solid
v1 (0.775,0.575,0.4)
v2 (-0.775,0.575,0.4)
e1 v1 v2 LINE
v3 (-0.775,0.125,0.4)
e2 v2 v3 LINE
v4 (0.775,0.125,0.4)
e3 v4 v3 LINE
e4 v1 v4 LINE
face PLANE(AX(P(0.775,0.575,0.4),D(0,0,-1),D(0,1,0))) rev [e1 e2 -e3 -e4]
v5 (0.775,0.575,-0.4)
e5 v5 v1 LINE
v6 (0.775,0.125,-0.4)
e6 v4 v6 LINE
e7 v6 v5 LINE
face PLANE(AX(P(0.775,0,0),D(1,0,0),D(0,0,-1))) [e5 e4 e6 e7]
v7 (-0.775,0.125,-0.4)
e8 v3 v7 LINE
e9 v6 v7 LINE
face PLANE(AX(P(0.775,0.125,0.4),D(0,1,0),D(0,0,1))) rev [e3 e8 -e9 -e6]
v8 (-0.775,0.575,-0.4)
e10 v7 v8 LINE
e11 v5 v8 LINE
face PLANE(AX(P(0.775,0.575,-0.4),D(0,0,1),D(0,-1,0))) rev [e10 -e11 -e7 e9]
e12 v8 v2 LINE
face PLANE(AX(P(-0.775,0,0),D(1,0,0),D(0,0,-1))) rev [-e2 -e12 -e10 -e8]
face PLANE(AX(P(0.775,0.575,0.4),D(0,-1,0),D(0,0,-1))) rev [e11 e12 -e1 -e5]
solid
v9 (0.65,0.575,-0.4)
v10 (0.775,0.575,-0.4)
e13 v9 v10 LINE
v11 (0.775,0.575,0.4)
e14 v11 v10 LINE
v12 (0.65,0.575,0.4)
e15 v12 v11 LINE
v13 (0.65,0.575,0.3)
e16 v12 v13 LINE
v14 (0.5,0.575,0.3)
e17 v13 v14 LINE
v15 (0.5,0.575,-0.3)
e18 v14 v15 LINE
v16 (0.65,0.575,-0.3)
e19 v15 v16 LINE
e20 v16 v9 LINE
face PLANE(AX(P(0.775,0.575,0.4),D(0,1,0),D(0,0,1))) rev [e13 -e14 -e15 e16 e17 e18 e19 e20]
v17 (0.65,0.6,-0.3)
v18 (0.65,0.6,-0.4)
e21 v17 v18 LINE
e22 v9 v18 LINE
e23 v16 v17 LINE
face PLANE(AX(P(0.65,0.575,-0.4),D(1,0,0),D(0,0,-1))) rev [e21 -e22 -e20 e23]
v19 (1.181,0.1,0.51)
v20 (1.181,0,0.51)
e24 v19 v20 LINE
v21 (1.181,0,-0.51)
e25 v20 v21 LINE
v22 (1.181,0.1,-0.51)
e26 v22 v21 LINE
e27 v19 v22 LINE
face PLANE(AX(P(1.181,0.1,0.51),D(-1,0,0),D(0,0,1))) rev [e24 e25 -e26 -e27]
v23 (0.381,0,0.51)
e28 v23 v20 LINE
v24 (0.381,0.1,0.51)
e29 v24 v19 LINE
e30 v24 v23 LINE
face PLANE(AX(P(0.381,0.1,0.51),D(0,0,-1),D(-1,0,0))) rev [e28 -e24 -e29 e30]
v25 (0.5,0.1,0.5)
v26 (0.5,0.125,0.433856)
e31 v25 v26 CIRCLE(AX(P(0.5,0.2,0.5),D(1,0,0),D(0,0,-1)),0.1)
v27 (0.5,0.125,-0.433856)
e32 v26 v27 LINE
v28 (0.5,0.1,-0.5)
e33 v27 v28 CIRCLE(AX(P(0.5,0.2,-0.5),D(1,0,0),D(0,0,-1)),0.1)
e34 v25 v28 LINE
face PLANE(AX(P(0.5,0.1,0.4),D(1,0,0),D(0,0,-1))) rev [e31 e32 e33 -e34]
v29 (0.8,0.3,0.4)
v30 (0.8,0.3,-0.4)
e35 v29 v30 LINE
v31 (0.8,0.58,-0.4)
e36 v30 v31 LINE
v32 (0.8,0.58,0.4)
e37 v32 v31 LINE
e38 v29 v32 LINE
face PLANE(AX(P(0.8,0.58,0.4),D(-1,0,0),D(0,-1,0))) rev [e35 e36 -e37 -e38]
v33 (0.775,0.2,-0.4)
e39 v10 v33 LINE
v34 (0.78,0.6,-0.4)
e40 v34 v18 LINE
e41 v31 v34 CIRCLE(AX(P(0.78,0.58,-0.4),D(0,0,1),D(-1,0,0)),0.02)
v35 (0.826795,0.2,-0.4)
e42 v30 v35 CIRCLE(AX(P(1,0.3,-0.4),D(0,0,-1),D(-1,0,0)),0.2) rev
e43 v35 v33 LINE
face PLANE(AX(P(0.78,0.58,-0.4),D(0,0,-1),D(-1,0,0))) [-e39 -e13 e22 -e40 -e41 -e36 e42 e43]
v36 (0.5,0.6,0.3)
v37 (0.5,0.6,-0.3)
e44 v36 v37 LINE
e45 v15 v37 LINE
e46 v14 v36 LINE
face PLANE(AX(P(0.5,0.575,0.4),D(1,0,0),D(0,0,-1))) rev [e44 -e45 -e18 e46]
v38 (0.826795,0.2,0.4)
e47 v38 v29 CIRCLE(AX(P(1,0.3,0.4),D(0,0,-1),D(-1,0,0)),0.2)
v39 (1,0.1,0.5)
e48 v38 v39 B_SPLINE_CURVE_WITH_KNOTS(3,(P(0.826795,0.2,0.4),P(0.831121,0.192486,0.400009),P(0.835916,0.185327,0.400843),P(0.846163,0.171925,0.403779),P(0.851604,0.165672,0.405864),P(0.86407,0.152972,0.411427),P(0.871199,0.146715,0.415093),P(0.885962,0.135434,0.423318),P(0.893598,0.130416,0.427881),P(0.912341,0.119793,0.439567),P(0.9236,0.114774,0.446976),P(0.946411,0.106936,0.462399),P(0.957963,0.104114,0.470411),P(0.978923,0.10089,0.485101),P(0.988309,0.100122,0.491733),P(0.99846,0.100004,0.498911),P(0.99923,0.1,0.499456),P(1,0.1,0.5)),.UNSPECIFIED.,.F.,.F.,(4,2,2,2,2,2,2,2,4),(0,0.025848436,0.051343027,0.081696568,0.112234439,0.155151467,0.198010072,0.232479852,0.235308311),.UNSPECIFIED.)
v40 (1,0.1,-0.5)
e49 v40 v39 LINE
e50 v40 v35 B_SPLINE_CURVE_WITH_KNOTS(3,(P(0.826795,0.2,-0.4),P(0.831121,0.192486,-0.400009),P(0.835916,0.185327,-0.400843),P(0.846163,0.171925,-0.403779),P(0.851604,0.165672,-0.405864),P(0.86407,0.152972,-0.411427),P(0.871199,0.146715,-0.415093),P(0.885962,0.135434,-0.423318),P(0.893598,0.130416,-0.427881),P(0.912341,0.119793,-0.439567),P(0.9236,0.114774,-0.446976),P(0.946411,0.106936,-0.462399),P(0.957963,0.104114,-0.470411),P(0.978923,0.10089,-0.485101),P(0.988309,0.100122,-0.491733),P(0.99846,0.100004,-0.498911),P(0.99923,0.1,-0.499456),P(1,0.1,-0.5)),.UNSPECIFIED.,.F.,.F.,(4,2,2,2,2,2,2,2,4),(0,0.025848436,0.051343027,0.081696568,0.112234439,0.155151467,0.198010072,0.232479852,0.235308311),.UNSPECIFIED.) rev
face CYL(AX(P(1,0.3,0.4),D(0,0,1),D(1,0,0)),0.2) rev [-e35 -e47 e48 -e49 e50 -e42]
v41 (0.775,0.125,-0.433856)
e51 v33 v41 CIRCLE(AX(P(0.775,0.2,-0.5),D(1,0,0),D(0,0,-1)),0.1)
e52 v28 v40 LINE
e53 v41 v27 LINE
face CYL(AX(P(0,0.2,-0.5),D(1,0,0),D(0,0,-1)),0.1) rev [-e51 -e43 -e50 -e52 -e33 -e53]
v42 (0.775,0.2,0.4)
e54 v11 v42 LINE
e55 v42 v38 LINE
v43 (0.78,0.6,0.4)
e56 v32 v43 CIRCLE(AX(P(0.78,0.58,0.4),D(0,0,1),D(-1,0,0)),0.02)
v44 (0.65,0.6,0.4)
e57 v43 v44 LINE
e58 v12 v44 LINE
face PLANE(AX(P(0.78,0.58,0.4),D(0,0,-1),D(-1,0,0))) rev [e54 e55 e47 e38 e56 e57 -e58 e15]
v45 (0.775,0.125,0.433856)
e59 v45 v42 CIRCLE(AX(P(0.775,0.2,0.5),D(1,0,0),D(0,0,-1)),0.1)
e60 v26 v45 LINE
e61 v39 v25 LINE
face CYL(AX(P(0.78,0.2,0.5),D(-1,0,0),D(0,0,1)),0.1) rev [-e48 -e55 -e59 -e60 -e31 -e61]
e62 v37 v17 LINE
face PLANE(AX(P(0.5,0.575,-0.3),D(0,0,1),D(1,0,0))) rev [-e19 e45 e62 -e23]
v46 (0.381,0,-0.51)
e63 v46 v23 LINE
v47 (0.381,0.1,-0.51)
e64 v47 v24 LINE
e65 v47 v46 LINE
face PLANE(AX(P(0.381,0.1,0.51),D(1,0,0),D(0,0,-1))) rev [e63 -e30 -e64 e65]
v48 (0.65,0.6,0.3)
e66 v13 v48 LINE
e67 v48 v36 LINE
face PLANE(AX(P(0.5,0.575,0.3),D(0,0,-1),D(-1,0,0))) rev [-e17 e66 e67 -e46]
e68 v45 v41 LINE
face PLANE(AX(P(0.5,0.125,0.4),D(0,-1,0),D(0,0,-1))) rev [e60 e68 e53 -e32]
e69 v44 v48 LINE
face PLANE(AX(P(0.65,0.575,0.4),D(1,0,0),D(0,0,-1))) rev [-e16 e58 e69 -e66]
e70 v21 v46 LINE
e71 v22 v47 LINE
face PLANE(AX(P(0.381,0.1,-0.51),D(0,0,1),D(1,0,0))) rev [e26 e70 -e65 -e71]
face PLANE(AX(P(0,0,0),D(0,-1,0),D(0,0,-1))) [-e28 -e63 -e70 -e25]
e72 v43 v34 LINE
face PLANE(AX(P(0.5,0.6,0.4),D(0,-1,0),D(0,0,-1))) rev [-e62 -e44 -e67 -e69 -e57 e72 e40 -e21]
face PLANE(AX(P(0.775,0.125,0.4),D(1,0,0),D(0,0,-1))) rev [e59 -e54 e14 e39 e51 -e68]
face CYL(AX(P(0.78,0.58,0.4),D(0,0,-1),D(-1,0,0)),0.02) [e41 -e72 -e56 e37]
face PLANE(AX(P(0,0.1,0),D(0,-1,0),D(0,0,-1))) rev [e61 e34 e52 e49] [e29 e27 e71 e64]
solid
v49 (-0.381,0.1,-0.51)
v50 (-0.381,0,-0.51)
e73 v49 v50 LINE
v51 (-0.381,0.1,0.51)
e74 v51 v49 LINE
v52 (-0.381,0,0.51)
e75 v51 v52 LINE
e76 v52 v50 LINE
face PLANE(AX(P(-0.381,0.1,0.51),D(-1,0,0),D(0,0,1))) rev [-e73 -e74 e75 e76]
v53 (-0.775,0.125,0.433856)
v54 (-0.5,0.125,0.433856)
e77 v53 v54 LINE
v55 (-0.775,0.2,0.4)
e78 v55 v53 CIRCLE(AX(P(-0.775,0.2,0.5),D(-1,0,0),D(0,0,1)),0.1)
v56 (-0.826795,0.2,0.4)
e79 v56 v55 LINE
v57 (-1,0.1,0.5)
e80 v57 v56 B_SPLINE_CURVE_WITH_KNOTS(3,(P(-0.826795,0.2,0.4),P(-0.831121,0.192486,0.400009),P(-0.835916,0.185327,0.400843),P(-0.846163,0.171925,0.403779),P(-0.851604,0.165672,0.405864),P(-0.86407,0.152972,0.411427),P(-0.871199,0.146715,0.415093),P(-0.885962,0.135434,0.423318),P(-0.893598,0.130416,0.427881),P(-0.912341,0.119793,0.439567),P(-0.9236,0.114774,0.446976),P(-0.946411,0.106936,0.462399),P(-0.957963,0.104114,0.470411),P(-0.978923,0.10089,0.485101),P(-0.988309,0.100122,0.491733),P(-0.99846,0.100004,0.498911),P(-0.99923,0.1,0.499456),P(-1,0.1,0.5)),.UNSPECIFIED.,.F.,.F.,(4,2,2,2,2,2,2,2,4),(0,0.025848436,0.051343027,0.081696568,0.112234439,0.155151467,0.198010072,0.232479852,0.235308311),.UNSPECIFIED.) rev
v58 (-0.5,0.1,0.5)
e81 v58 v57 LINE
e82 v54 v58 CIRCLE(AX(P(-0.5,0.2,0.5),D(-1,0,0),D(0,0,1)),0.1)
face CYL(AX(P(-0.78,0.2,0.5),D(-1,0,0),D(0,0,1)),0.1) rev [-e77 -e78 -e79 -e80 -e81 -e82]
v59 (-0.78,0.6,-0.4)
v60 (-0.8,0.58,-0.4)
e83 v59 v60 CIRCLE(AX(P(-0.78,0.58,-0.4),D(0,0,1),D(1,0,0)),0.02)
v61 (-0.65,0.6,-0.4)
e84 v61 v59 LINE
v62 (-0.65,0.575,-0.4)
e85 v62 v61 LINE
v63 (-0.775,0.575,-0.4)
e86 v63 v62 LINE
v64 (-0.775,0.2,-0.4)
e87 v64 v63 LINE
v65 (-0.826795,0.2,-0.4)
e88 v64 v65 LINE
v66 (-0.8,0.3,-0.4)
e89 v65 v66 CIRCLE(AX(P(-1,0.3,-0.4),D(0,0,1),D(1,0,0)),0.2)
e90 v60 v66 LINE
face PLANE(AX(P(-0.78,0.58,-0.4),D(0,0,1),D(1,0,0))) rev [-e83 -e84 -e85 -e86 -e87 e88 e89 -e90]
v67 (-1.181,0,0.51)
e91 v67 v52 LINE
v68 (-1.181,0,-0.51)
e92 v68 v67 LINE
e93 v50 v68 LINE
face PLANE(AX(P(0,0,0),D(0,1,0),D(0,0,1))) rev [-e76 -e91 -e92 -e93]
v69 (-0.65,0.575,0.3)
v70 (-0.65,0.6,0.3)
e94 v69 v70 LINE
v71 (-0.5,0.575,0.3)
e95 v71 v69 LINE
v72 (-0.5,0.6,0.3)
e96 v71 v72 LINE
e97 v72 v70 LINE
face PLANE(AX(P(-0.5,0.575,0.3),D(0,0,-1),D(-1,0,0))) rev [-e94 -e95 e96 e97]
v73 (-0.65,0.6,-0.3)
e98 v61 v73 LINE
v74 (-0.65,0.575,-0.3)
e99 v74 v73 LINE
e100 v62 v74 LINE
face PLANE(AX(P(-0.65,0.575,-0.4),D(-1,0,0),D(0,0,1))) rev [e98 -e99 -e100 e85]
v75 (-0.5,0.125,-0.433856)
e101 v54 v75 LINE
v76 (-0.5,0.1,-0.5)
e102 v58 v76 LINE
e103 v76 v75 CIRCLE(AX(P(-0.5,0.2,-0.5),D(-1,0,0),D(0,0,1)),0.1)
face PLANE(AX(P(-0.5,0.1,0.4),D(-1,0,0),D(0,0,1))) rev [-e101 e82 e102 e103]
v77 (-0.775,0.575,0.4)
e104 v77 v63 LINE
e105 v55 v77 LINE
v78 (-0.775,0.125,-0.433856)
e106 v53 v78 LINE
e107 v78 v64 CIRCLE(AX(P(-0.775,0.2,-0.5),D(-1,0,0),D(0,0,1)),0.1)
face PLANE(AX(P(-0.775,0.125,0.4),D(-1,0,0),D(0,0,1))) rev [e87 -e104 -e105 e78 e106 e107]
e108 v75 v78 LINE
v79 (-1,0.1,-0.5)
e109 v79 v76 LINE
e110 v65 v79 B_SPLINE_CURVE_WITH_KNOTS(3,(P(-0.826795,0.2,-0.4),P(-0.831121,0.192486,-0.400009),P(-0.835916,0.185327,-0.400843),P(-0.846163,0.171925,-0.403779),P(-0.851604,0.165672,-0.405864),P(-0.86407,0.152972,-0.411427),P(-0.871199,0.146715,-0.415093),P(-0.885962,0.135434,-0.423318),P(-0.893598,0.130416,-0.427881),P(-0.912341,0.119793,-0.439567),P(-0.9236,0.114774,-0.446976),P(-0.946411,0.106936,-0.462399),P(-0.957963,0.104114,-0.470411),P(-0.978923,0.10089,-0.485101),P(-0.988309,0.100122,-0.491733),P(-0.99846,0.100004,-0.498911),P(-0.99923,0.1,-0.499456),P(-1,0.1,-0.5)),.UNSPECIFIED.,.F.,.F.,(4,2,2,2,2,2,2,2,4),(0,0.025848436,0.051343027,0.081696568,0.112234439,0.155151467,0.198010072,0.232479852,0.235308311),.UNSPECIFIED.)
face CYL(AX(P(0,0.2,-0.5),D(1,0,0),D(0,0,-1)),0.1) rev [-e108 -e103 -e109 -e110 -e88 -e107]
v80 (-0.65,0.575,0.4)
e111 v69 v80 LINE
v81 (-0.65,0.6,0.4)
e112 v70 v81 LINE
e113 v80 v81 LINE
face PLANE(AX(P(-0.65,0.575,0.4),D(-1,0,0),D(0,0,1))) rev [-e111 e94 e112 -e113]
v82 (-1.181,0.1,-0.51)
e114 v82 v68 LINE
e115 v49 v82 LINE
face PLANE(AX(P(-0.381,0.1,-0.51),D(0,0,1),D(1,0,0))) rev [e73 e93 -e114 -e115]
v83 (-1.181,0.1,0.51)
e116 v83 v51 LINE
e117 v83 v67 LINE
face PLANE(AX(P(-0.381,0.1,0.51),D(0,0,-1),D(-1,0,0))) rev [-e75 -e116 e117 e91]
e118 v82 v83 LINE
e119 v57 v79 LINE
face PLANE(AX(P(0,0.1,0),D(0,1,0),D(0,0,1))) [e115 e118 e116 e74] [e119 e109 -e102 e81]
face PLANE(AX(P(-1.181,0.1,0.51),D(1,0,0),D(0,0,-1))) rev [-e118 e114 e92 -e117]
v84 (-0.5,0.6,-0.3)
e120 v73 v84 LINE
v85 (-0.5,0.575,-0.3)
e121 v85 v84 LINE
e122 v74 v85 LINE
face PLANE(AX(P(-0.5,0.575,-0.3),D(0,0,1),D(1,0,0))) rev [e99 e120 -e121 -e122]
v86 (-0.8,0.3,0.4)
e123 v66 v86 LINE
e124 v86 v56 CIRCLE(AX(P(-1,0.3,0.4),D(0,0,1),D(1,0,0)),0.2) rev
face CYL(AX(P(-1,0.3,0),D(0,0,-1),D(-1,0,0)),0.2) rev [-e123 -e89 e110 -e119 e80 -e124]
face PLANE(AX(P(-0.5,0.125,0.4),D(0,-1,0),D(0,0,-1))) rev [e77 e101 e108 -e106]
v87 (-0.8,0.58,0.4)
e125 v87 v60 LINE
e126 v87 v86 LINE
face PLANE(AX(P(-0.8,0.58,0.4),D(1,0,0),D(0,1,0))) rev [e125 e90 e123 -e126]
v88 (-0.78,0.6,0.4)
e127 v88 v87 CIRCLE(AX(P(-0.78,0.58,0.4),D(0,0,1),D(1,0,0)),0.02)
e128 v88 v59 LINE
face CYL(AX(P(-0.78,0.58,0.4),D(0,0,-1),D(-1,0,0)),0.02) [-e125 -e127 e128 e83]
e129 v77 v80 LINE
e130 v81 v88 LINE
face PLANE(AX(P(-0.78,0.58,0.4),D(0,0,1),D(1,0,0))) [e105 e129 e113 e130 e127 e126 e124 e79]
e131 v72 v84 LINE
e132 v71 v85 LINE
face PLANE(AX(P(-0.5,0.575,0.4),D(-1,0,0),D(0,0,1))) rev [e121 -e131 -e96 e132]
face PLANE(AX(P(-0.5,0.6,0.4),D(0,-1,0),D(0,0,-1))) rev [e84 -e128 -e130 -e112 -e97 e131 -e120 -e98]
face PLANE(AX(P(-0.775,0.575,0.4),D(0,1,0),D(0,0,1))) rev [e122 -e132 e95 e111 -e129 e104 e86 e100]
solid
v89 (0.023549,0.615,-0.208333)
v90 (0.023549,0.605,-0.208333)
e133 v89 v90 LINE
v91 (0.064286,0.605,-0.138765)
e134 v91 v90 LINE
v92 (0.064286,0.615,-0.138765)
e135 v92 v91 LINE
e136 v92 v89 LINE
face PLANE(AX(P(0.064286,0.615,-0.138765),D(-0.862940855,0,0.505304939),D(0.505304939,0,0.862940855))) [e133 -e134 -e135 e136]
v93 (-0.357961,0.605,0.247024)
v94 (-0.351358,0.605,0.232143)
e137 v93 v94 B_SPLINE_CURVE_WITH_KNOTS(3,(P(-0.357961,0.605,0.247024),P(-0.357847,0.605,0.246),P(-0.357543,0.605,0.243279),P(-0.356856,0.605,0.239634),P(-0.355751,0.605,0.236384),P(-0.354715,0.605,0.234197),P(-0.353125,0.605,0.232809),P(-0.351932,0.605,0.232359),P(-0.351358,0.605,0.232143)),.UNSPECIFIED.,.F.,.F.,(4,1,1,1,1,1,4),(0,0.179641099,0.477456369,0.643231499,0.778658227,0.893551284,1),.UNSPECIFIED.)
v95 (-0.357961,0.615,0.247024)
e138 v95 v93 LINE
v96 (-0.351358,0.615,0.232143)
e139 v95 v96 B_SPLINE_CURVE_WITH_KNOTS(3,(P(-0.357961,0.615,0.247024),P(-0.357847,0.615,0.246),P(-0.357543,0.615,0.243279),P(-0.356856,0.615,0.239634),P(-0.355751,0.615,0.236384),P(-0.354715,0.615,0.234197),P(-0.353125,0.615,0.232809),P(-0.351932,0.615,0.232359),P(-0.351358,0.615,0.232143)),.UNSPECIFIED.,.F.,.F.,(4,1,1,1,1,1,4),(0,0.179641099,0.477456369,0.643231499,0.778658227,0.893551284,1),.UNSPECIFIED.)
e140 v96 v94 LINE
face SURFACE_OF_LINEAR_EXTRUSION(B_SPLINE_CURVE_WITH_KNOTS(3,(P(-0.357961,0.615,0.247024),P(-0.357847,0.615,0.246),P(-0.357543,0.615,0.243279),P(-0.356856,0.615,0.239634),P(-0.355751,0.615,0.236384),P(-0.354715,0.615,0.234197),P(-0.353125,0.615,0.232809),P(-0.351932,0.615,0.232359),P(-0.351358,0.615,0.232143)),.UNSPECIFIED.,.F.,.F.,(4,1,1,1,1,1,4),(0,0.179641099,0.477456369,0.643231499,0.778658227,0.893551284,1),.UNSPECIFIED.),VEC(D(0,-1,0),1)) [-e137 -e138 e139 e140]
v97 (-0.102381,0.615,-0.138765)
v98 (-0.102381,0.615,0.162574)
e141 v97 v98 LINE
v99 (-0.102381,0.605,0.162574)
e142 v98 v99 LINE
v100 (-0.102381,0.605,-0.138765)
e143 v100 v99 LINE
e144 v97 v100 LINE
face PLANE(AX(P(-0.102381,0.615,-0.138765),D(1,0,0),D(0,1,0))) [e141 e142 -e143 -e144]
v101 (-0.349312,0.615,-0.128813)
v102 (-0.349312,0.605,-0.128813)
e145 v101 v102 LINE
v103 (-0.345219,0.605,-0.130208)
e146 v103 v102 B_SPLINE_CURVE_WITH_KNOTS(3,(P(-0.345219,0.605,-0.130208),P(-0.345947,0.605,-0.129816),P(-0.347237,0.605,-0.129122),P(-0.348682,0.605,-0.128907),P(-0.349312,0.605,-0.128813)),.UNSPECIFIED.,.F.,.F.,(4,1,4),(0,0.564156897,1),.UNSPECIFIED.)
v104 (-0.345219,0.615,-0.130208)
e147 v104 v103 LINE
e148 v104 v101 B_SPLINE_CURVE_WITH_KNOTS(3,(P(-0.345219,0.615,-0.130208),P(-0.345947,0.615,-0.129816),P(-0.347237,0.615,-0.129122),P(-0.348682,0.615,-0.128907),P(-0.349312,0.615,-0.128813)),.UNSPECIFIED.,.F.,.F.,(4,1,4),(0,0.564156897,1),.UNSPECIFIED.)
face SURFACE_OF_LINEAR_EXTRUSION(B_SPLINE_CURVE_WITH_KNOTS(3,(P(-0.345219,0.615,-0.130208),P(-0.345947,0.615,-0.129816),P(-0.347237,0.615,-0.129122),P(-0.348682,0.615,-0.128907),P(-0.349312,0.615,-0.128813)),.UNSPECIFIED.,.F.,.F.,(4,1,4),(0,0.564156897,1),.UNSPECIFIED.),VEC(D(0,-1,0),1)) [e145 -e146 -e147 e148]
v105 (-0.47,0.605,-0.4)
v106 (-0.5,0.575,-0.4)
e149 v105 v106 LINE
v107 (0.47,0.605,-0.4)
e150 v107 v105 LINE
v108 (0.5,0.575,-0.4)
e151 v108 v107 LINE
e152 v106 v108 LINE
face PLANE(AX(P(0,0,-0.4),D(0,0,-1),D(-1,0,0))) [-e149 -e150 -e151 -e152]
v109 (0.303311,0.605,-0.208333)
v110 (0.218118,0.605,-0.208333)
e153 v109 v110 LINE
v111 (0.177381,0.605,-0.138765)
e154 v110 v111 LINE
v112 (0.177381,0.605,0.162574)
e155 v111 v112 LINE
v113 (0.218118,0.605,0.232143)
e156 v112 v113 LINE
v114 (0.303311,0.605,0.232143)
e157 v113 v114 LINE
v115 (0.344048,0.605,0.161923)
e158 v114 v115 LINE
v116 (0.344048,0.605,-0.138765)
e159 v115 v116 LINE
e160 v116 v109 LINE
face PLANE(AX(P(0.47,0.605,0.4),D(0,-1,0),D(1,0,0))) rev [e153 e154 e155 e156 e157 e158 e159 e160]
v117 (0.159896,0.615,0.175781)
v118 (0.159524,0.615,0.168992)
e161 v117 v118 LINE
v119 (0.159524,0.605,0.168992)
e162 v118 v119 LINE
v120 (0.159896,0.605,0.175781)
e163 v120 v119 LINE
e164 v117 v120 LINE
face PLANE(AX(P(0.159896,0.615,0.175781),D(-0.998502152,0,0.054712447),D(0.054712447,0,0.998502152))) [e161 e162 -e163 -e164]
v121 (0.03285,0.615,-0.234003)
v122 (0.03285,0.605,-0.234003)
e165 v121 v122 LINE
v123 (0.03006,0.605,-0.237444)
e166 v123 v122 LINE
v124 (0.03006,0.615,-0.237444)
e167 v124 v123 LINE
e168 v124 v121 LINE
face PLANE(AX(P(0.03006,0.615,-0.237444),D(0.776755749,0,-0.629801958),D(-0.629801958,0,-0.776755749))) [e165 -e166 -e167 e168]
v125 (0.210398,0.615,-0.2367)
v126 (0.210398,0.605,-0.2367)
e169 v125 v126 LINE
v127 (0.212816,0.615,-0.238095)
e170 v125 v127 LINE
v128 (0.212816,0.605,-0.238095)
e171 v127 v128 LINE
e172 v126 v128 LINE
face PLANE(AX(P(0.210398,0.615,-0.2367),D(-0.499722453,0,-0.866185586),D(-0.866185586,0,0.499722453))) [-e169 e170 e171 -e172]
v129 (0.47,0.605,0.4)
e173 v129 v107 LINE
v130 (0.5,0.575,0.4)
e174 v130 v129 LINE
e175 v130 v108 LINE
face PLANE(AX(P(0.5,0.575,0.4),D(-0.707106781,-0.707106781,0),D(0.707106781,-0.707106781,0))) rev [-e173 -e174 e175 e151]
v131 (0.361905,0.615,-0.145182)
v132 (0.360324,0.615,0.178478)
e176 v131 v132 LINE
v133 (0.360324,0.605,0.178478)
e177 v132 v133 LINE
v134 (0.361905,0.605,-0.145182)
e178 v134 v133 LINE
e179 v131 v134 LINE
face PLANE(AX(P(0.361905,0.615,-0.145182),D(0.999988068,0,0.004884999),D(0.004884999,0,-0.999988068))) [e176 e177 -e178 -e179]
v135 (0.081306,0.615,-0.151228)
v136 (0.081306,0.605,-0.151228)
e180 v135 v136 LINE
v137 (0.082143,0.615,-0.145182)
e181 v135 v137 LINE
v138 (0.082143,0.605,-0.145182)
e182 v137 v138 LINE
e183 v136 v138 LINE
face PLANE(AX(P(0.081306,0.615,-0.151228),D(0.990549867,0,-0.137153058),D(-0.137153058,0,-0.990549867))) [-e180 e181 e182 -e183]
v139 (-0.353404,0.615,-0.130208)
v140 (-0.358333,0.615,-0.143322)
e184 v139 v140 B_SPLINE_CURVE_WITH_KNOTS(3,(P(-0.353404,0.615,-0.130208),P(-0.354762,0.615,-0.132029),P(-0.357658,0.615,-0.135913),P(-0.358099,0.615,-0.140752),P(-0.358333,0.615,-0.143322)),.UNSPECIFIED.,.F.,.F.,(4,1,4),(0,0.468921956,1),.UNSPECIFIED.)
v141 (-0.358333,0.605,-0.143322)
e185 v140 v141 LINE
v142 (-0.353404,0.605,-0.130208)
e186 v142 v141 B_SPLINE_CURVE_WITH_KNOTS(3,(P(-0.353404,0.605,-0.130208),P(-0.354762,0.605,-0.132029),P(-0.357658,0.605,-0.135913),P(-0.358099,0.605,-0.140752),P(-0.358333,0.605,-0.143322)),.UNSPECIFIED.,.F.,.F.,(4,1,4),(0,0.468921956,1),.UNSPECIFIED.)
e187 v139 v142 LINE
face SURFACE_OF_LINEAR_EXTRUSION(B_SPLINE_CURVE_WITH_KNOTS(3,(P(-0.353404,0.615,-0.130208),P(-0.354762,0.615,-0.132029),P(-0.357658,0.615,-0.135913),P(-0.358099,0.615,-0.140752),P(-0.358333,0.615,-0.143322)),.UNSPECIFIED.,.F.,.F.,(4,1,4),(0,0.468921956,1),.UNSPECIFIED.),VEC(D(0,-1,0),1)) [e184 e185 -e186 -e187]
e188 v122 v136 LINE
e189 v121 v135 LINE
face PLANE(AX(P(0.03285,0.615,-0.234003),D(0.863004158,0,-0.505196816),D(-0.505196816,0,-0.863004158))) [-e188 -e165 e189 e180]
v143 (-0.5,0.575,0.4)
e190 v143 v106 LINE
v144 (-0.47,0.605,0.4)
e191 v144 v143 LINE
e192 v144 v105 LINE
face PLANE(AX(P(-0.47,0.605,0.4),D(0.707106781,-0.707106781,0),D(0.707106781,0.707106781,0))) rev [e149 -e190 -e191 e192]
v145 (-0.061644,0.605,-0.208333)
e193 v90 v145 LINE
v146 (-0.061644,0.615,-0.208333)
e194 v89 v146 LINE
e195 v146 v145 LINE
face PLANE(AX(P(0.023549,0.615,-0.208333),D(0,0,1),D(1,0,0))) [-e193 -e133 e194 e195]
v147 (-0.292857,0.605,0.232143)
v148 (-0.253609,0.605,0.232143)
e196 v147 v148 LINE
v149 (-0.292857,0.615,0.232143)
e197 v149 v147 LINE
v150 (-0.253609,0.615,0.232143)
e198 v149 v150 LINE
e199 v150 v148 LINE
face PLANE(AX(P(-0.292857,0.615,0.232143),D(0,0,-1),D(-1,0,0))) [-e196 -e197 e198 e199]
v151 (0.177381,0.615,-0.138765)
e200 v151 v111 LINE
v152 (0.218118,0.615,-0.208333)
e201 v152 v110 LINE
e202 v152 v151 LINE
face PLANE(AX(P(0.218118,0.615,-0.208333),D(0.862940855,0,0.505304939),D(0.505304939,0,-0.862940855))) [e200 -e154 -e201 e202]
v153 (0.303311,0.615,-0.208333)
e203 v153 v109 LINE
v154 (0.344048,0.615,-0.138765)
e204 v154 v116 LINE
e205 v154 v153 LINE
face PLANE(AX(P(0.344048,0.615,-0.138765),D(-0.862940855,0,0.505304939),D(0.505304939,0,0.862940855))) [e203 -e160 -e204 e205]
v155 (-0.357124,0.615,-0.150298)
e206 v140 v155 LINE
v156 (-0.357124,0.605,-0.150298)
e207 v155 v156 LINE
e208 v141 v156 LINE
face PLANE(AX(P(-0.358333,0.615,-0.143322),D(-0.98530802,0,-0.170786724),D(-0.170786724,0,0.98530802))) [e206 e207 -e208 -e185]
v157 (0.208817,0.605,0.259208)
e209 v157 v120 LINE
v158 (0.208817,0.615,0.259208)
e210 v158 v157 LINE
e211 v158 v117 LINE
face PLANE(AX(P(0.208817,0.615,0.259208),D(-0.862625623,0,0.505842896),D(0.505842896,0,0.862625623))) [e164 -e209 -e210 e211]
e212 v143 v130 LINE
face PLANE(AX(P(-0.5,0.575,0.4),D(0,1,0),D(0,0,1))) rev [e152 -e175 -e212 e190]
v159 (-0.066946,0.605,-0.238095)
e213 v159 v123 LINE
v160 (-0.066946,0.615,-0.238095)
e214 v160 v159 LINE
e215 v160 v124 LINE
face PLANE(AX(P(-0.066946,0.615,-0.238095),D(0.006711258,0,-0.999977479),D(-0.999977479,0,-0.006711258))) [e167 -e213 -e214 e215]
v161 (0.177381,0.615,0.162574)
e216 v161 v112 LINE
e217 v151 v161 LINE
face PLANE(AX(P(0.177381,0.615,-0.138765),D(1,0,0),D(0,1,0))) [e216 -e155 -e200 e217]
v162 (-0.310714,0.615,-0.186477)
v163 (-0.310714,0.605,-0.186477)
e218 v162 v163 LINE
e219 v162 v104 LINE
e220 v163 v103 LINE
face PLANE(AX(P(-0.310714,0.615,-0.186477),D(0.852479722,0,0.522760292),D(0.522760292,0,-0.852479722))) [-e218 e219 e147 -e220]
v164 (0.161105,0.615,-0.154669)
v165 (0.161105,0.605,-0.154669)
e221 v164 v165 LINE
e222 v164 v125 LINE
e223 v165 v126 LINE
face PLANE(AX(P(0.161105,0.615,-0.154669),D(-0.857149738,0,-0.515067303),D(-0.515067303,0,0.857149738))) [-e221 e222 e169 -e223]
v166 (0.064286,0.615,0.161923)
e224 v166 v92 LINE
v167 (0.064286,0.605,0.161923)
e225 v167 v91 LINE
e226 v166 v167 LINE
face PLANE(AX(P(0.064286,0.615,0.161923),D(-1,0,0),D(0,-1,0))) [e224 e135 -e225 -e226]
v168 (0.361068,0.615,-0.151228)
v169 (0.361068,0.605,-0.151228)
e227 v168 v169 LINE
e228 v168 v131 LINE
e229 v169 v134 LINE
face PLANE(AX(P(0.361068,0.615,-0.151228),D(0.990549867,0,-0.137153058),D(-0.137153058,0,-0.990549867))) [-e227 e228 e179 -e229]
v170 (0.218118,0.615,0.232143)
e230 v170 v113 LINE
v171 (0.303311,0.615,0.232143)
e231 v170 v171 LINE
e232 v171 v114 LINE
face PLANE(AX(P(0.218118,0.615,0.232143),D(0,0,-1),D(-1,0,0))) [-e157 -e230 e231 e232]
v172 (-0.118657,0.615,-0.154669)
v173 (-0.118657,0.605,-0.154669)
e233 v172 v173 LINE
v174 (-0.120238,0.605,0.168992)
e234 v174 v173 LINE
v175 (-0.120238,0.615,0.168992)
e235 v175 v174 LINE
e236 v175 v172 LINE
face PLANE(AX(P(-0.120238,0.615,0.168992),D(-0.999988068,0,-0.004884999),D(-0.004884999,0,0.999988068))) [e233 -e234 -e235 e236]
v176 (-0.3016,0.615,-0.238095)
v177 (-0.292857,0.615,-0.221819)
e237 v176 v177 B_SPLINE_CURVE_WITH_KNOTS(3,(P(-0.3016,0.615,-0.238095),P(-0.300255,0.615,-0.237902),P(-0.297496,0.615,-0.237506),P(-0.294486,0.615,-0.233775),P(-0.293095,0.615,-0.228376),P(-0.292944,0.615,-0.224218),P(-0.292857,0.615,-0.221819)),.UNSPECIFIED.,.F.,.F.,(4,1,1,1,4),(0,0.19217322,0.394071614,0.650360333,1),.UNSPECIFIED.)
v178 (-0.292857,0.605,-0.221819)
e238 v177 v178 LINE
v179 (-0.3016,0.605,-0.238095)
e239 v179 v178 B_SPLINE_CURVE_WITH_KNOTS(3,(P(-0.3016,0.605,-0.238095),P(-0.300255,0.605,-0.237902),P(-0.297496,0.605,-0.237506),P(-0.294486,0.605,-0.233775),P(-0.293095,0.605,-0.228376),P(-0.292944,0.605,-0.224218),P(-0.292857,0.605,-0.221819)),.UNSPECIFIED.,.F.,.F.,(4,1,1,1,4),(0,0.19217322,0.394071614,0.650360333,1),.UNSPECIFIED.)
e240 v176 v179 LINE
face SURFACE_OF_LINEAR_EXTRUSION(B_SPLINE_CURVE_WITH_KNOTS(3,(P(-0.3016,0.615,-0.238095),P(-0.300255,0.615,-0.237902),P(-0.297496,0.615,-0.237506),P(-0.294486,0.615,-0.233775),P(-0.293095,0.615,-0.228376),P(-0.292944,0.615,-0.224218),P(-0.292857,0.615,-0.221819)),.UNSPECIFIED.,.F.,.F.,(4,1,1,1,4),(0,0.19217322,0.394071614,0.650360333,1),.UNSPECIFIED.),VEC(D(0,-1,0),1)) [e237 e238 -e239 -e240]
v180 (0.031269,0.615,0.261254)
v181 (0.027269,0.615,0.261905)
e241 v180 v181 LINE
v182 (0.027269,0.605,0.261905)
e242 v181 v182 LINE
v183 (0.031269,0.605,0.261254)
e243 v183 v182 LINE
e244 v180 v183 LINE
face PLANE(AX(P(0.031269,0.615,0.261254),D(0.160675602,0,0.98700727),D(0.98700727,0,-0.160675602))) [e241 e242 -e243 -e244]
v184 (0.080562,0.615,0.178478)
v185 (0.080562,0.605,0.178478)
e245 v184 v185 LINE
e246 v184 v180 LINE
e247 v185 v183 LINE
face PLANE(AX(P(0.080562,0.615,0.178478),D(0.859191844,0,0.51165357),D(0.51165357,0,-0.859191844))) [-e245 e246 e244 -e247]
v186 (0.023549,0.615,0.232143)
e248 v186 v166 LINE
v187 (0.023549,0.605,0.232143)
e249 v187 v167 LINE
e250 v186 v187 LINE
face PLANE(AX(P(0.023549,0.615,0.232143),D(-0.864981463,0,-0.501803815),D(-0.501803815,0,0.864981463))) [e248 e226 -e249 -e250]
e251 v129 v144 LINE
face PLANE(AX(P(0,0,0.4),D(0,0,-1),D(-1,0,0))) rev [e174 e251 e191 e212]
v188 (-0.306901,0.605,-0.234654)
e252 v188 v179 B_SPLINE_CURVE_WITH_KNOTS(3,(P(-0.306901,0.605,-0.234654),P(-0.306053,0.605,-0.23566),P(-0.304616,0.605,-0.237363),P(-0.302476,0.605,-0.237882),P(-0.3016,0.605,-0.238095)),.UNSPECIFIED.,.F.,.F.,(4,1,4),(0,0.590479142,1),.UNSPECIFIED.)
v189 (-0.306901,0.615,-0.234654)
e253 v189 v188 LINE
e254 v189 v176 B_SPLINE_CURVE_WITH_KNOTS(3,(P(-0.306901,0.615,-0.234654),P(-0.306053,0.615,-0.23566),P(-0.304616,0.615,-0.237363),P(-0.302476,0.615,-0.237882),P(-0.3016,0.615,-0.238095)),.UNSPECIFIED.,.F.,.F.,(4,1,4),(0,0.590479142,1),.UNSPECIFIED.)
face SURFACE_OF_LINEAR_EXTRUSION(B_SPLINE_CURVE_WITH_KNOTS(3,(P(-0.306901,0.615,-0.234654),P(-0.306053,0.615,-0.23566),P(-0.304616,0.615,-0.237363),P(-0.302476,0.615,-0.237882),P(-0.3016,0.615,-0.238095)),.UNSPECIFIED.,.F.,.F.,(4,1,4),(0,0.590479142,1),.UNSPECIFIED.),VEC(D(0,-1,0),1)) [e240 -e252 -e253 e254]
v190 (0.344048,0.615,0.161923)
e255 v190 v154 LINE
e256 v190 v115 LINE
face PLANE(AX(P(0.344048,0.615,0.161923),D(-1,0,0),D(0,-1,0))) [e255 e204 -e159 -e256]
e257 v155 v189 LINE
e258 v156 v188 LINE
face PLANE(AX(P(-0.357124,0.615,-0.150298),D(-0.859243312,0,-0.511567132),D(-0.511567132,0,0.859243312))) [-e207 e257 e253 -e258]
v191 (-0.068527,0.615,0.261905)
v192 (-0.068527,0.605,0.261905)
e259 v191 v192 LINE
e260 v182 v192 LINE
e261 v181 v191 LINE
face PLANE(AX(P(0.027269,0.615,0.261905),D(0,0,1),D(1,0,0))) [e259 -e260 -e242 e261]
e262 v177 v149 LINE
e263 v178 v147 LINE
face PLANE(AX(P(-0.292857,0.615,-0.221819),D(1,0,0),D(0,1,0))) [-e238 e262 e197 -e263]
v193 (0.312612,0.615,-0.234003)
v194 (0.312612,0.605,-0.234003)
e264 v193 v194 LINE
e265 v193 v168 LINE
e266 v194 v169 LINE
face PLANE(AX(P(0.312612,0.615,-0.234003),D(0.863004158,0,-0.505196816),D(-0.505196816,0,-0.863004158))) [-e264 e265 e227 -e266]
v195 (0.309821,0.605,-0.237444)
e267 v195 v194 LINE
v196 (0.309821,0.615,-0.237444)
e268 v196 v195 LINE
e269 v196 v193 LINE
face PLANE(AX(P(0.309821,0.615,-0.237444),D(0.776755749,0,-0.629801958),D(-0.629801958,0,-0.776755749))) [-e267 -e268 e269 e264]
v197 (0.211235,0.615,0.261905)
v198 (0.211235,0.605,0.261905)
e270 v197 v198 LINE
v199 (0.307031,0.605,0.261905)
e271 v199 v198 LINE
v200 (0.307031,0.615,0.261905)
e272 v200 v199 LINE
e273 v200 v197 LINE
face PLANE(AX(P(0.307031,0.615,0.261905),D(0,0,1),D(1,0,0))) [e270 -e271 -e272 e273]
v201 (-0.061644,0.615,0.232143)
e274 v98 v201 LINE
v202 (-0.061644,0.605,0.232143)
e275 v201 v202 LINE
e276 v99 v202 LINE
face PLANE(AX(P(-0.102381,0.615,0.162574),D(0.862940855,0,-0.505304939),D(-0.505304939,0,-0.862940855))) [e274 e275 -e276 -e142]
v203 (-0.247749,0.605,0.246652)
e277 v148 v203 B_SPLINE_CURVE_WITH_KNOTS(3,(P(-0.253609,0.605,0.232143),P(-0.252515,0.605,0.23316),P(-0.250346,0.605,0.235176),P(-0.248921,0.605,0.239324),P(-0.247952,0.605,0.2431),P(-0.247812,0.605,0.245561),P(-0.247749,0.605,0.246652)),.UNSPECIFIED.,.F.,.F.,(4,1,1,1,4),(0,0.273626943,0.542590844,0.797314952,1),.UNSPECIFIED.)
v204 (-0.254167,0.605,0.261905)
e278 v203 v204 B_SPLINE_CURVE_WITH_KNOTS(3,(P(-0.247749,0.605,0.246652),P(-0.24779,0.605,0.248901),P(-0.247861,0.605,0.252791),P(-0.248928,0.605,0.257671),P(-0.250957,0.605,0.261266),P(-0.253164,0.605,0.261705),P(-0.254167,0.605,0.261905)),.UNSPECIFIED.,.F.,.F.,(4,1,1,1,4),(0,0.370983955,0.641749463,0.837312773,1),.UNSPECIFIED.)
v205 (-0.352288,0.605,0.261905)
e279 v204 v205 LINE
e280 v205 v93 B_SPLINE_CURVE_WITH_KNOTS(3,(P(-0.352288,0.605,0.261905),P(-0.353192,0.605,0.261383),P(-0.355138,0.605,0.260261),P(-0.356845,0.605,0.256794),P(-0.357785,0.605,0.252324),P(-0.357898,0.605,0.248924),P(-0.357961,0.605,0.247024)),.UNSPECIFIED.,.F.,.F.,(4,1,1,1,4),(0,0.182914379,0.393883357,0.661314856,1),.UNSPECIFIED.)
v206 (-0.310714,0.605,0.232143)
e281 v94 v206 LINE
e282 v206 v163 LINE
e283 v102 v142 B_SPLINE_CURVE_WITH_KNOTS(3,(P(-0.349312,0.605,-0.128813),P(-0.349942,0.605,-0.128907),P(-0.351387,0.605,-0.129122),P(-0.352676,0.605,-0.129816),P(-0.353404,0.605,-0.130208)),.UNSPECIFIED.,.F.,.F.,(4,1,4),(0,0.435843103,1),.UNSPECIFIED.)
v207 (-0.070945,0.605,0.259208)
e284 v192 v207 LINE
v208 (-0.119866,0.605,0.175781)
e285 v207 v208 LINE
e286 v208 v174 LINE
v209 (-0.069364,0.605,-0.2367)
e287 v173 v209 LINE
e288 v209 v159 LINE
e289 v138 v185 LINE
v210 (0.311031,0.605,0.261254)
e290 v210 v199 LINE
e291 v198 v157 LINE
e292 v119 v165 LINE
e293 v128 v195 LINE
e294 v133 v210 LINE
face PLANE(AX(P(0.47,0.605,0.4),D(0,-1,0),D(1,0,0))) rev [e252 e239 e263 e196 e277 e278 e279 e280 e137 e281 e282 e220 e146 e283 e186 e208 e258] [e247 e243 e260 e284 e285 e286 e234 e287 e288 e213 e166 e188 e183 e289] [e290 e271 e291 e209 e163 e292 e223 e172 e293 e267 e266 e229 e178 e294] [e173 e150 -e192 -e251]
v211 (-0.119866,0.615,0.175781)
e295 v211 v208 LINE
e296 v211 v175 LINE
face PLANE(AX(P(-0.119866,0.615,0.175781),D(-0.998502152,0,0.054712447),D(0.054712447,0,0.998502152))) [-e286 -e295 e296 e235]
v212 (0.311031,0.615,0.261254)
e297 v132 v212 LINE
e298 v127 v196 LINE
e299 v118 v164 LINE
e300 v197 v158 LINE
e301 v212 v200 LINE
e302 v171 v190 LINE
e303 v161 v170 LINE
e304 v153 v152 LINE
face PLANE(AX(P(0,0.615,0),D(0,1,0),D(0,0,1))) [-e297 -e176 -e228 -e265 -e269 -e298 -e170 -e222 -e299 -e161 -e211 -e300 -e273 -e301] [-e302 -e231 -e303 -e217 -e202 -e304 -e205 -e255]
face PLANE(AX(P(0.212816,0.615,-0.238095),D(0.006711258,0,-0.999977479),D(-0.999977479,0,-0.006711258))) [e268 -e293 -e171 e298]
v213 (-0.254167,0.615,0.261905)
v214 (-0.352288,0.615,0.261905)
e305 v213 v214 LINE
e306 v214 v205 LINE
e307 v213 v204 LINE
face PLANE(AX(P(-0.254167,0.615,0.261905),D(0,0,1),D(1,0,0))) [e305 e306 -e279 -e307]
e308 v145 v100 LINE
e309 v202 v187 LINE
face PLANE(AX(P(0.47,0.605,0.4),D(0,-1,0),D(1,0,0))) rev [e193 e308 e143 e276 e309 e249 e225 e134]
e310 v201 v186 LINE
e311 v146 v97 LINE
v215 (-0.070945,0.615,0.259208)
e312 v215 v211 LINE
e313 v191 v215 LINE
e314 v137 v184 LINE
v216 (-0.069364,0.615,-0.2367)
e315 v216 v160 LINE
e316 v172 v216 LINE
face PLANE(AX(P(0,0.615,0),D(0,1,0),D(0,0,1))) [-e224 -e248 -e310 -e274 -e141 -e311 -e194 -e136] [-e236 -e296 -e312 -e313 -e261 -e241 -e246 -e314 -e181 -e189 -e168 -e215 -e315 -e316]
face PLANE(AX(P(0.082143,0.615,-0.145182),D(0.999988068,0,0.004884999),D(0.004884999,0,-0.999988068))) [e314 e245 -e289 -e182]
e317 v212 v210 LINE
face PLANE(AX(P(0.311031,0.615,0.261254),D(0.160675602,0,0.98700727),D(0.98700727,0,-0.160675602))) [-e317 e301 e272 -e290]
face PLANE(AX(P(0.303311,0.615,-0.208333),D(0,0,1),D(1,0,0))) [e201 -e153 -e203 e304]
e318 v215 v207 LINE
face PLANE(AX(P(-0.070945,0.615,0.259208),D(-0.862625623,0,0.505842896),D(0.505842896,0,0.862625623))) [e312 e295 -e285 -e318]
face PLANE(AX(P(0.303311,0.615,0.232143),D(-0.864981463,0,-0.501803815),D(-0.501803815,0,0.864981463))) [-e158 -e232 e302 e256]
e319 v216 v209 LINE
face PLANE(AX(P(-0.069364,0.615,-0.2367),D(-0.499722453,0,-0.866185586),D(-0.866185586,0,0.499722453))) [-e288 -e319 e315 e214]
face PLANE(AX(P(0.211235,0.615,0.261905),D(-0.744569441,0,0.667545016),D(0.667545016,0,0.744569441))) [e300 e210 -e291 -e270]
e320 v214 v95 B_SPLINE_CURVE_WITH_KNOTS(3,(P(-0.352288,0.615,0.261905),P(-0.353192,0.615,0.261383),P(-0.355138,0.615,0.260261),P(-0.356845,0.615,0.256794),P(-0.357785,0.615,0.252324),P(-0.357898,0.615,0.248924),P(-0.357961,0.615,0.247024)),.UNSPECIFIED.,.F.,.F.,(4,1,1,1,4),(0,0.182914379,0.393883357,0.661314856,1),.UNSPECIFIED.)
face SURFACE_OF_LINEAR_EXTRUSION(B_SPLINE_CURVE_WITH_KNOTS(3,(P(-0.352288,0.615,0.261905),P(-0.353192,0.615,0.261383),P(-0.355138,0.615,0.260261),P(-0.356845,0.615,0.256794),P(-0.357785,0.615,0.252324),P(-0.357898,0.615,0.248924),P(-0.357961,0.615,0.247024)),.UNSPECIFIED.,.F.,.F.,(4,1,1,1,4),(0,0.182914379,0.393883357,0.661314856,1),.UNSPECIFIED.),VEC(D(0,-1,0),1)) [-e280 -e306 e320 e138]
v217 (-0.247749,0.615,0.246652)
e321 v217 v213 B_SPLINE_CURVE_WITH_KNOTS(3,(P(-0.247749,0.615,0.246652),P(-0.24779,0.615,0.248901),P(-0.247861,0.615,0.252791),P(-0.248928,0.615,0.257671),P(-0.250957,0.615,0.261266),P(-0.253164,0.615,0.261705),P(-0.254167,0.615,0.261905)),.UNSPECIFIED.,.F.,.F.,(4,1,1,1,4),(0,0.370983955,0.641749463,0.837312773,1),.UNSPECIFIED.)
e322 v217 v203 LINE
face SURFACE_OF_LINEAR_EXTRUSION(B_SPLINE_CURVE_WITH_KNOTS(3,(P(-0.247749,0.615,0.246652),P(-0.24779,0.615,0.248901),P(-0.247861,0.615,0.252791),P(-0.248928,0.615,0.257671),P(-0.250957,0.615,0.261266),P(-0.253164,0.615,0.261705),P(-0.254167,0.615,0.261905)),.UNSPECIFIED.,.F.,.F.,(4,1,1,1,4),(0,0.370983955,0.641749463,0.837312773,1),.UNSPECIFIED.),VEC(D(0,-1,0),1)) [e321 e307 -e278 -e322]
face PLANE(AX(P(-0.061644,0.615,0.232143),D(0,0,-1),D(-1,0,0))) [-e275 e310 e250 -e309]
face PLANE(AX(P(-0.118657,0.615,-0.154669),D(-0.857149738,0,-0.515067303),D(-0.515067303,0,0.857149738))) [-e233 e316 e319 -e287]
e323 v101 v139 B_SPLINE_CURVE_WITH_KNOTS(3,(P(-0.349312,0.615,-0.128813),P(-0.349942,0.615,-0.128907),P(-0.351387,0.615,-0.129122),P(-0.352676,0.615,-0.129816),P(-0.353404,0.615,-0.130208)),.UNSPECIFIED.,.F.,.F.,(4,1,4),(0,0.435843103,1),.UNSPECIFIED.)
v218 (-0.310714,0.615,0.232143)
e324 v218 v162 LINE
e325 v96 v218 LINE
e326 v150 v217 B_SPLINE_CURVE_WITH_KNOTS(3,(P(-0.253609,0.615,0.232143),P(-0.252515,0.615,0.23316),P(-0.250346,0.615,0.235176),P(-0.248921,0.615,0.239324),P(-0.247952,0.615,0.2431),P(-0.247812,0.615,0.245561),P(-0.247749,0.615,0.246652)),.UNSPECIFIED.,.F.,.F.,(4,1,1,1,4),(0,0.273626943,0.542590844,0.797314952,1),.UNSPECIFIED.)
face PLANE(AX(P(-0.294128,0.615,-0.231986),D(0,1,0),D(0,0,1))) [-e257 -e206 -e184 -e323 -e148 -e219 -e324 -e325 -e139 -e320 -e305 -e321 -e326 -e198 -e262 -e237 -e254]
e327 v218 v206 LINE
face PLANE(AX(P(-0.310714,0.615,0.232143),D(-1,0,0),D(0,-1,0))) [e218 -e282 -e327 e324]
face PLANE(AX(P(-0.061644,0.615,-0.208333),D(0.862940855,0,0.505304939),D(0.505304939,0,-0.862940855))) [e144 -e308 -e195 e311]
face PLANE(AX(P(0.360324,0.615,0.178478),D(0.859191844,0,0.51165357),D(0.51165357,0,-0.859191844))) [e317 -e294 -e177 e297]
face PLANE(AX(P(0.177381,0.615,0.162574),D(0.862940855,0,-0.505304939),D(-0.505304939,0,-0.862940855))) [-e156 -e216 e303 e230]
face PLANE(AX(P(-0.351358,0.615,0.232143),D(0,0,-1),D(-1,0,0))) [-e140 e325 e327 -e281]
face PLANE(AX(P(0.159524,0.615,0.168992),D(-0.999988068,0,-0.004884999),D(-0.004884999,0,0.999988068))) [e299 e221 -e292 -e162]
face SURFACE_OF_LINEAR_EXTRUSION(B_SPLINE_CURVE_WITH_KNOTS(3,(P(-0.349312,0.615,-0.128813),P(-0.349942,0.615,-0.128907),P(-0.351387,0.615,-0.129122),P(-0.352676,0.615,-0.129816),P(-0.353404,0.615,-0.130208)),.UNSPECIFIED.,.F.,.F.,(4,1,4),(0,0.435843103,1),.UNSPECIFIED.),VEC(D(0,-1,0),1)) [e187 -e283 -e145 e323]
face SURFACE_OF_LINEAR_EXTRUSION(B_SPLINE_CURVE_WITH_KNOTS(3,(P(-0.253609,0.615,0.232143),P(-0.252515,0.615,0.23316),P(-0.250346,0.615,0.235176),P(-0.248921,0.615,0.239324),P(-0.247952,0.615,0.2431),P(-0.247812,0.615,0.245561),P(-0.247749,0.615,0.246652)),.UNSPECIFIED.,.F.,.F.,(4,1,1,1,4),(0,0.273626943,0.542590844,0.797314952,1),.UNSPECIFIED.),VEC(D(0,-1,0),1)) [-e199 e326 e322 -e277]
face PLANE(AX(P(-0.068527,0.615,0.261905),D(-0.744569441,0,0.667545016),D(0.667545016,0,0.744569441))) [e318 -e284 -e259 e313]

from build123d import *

# Parameters (mm, degrees)
SKETCH1_W             = 0.8
SKETCH1_H             = 0.45
BOSS_EXTRUDE1_DEPTH   = 0.775
BOSS_EXTRUDE2_DEPTH   = 0.4
BOSS_EXTRUDE2_2_DEPTH = 0.4
SKETCH3_W             = 0.15
SKETCH3_H             = 0.1
CUT_EXTRUDE1_DEPTH    = 0.025
BOSS_EXTRUDE3_DEPTH   = 0.4
BOSS_EXTRUDE4_DEPTH   = 0.01
SKETCH7_W             = 0.8
SKETCH7_H             = 1.02
BOSS_EXTRUDE5_DEPTH   = 0.1
FILLET3_R             = 0.2
FILLET4_R             = 0.2
FILLET5_R             = 0.1
FILLET6_R             = 0.1


with BuildPart() as part:
    # Sketch1 → Boss-Extrude1 (new, symmetric)
    with BuildSketch(Plane(origin=(0, 0, 0), x_dir=(0, 0, -1), z_dir=(1, 0, 0))):
        with Locations((0, 0.35)):
            Rectangle(SKETCH1_W, SKETCH1_H)
    extrude(amount=BOSS_EXTRUDE1_DEPTH, both=True)


with BuildPart() as body_2:
    # Sketch2 → Boss-Extrude2 (new, symmetric)
    with BuildSketch(Plane.XY):
        with BuildLine():
            Line((-0.5, 0.6), (-0.78, 0.6))
            ThreePointArc((-0.78, 0.6), (-0.794142136, 0.594142136), (-0.8, 0.58))
            Line((-0.8, 0.58), (-0.8, 0.1))
            Line((-0.8, 0.1), (-0.5, 0.1))
            Line((-0.5, 0.1), (-0.5, 0.125))
            Line((-0.5, 0.125), (-0.775, 0.125))
            Line((-0.775, 0.125), (-0.775, 0.575))
            Line((-0.775, 0.575), (-0.5, 0.575))
            Line((-0.5, 0.575), (-0.5, 0.6))
        make_face()
    extrude(amount=BOSS_EXTRUDE2_DEPTH, both=True)


with BuildPart() as body_3:
    # Sketch2 → Boss-Extrude2 2 (new, symmetric)
    with BuildSketch(Plane.XY):
        with BuildLine():
            Line((0.5, 0.575), (0.5, 0.6))
            Line((0.5, 0.6), (0.78, 0.6))
            ThreePointArc((0.78, 0.6), (0.794142136, 0.594142136), (0.8, 0.58))
            Line((0.8, 0.58), (0.8, 0.1))
            Line((0.8, 0.1), (0.5, 0.1))
            Line((0.5, 0.1), (0.5, 0.125))
            Line((0.5, 0.125), (0.775, 0.125))
            Line((0.775, 0.125), (0.775, 0.575))
            Line((0.775, 0.575), (0.5, 0.575))
        make_face()
    extrude(amount=BOSS_EXTRUDE2_2_DEPTH, both=True)


with BuildPart() as cut_extrude1_tool:
    # Sketch3 → Cut-Extrude1 (new body)
    with BuildSketch(Plane(origin=(0, 0.6, 0), x_dir=(1, 0, 0), z_dir=(0, 1, 0))):
        with Locations((-0.575, 0.35)):
            Rectangle(SKETCH3_W, SKETCH3_H)
        with Locations((-0.575, -0.35)):
            Rectangle(SKETCH3_W, SKETCH3_H)
        with Locations((0.575, -0.35)):
            Rectangle(SKETCH3_W, SKETCH3_H)
        with Locations((0.575, 0.35)):
            Rectangle(SKETCH3_W, SKETCH3_H)
    extrude(amount=-CUT_EXTRUDE1_DEPTH)


with BuildPart() as body_2_1:
    add(body_2.part)

    # Cut-Extrude1: cut by cut_extrude1_tool
    add(cut_extrude1_tool.part, mode=Mode.SUBTRACT)



with BuildPart() as body_3_1:
    add(body_3.part)

    # Cut-Extrude1: cut by cut_extrude1_tool
    add(cut_extrude1_tool.part, mode=Mode.SUBTRACT)


with BuildPart() as body_4:
    # Sketch4 → Boss-Extrude3 (new, symmetric)
    with BuildSketch(Plane.XY):
        Polygon((-0.5, 0.575), (0.5, 0.575), (0.47, 0.605), (-0.47, 0.605), align=None)
    extrude(amount=BOSS_EXTRUDE3_DEPTH, both=True)

    # Sketch6 → Boss-Extrude4 (add)
    # profile 1 of 3: a face of its own
    with BuildSketch(Plane(origin=(0, 0.605, 0), x_dir=(1, 0, 0), z_dir=(0, 1, 0))):
        with BuildLine():
            Line((-0.292857143, 0.221819196), (-0.292857143, -0.232142857))
            Line((-0.292857143, -0.232142857), (-0.253608631, -0.232142857))
            add(Edge.make_bspline(
                [(-0.253608631, -0.232142857), (-0.252514915, -0.233159523), (-0.250346122, -0.235175528), (-0.248921239, -0.239323698), (-0.247952001, -0.243100354), (-0.24781151, -0.245561302), (-0.247749256, -0.246651786)],
                knots=[0, 0, 0, 0, 1.094507773, 2.170363376, 3.18925981, 4, 4, 4, 4], degree=3))
            add(Edge.make_bspline(
                [(-0.247749256, -0.246651786), (-0.247790011, -0.24890061), (-0.247860511, -0.252790757), (-0.248927629, -0.257670974), (-0.250957131, -0.261266063), (-0.253164339, -0.261705298), (-0.254166667, -0.261904762)],
                knots=[0, 0, 0, 0, 1.483935822, 2.566997854, 3.349251094, 4, 4, 4, 4], degree=3))
            Line((-0.254166667, -0.261904762), (-0.352287946, -0.261904762))
            add(Edge.make_bspline(
                [(-0.352287946, -0.261904762), (-0.353191845, -0.261383497), (-0.355138277, -0.260261018), (-0.356845026, -0.256793507), (-0.357784968, -0.252323852), (-0.357898096, -0.248923727), (-0.35796131, -0.24702381)],
                knots=[0, 0, 0, 0, 0.731657516, 1.575533429, 2.645259425, 4, 4, 4, 4], degree=3))
            add(Edge.make_bspline(
                [(-0.35796131, -0.24702381), (-0.357847061, -0.245999991), (-0.357543408, -0.24327885), (-0.356855684, -0.239634421), (-0.355750939, -0.236384481), (-0.354715358, -0.234196716), (-0.35312544, -0.232808963), (-0.351931893, -0.232359173), (-0.351357887, -0.232142857)],
                knots=[0, 0, 0, 0, 1.077846596, 2.864738214, 3.859388994, 4.671949365, 5.361307703, 6, 6, 6, 6], degree=3))
            Line((-0.351357887, -0.232142857), (-0.310714286, -0.232142857))
            Line((-0.310714286, -0.232142857), (-0.310714286, 0.186476935))
            Line((-0.310714286, 0.186476935), (-0.345219494, 0.130208333))
            add(Edge.make_bspline(
                [(-0.345219494, 0.130208333), (-0.34594703, 0.129816395), (-0.34723663, 0.129121662), (-0.348681862, 0.128906863), (-0.349311756, 0.128813244)],
                knots=[0, 0, 0, 0, 1.128313794, 2, 2, 2, 2], degree=3))
            add(Edge.make_bspline(
                [(-0.349311756, 0.128813244), (-0.34994165, 0.128906863), (-0.351386882, 0.129121662), (-0.352676481, 0.129816395), (-0.353404018, 0.130208333)],
                knots=[0, 0, 0, 0, 0.871686206, 2, 2, 2, 2], degree=3))
            add(Edge.make_bspline(
                [(-0.353404018, 0.130208333), (-0.354762035, 0.132029405), (-0.357658077, 0.135912935), (-0.35809911, 0.140752164), (-0.358333333, 0.143322173)],
                knots=[0, 0, 0, 0, 0.937843913, 2, 2, 2, 2], degree=3))
            Line((-0.358333333, 0.143322173), (-0.357124256, 0.150297619))
            Line((-0.357124256, 0.150297619), (-0.306901042, 0.234654018))
            add(Edge.make_bspline(
                [(-0.306901042, 0.234654018), (-0.306052725, 0.23565958), (-0.304616067, 0.23736254), (-0.302476074, 0.237882361), (-0.301599702, 0.238095238)],
                knots=[0, 0, 0, 0, 1.180958283, 2, 2, 2, 2], degree=3))
            add(Edge.make_bspline(
                [(-0.301599702, 0.238095238), (-0.300254548, 0.237901979), (-0.297496165, 0.23750568), (-0.29448599, 0.233775342), (-0.293094631, 0.228376002), (-0.292944039, 0.224218313), (-0.292857143, 0.221819196)],
                knots=[0, 0, 0, 0, 0.76869288, 1.576286457, 2.601441333, 4, 4, 4, 4], degree=3))
        make_face()
    # profile 2 of 3: a face of its own
    with BuildSketch(Plane(origin=(0, 0.605, 0), x_dir=(1, 0, 0), z_dir=(0, 1, 0))):
        Polygon((0.032849702, 0.234002976), (0.081305804, 0.151227679), (0.082142857, 0.145182292), (0.080561756, -0.178478423), (0.031268601, -0.26125372), (0.027269345, -0.261904762), (-0.068526786, -0.261904762), (-0.07094494, -0.259207589), (-0.119866071, -0.17578125), (-0.120238095, -0.168991815), (-0.118656994, 0.154668899), (-0.069363839, 0.236700149), (-0.066945685, 0.238095238), (0.030059524, 0.237444196), align=None)
        Polygon((0.064285714, 0.138764881), (0.023549107, 0.208333333), (-0.061644345, 0.208333333), (-0.102380952, 0.138764881), (-0.102380952, -0.162574405), (-0.061644345, -0.232142857), (0.023549107, -0.232142857), (0.064285714, -0.161923363), align=None, mode=Mode.SUBTRACT)
    # profile 3 of 3: a face of its own
    with BuildSketch(Plane(origin=(0, 0.605, 0), x_dir=(1, 0, 0), z_dir=(0, 1, 0))):
        Polygon((0.312611607, 0.234002976), (0.361067708, 0.151227679), (0.361904762, 0.145182292), (0.360323661, -0.178478423), (0.311030506, -0.26125372), (0.30703125, -0.261904762), (0.211235119, -0.261904762), (0.208816964, -0.259207589), (0.159895833, -0.17578125), (0.15952381, -0.168991815), (0.161104911, 0.154668899), (0.210398065, 0.236700149), (0.21281622, 0.238095238), (0.309821429, 0.237444196), align=None)
        Polygon((0.344047619, 0.138764881), (0.303311012, 0.208333333), (0.21811756, 0.208333333), (0.177380952, 0.138764881), (0.177380952, -0.162574405), (0.21811756, -0.232142857), (0.303311012, -0.232142857), (0.344047619, -0.161923363), align=None, mode=Mode.SUBTRACT)
    extrude(amount=BOSS_EXTRUDE4_DEPTH)


with BuildPart() as body_2_2:
    add(body_2_1.part)

    add(body_3_1.part)  # Boss-Extrude5 merges body 3
    # Sketch7 → Boss-Extrude5 (add)
    with BuildSketch(Plane(origin=(0, 0, 0), x_dir=(1, 0, 0), z_dir=(0, 1, 0))):
        with Locations((-0.781, 0)):
            Rectangle(SKETCH7_W, SKETCH7_H)
        with Locations((0.781, 0)):
            Rectangle(SKETCH7_W, SKETCH7_H)
    extrude(amount=BOSS_EXTRUDE5_DEPTH)

    # Fillet3
    fillet3_edges = [body_2_2.edges().sort_by_distance(p)[0] for p in [
        (-0.8, 0.1, 0),
    ]]
    fillet(fillet3_edges, radius=FILLET3_R)

    # Fillet4
    fillet4_edges = [body_2_2.edges().sort_by_distance(p)[0] for p in [
        (0.8, 0.1, 0),
    ]]
    fillet(fillet4_edges, radius=FILLET4_R)

    # Fillet5
    fillet5_edges = [body_2_2.edges().sort_by_distance(p)[0] for p in [
        (0.75, 0.1, 0.4),
    ]]
    fillet(fillet5_edges, radius=FILLET5_R)
    fillet5_2_edges = [body_2_2.edges().sort_by_distance(p)[0] for p in [
        (0.75, 0.1, -0.4),
    ]]
    fillet(fillet5_2_edges, radius=FILLET5_R)

    # Fillet6
    fillet6_edges = [body_2_2.edges().sort_by_distance(p)[0] for p in [
        (-0.75, 0.1, -0.4),
    ]]
    fillet(fillet6_edges, radius=FILLET6_R)
    fillet6_2_edges = [body_2_2.edges().sort_by_distance(p)[0] for p in [
        (-0.75, 0.1, 0.4),
    ]]
    fillet(fillet6_2_edges, radius=FILLET6_R)


solid = Compound([part.part, body_4.part, body_2_2.part])
